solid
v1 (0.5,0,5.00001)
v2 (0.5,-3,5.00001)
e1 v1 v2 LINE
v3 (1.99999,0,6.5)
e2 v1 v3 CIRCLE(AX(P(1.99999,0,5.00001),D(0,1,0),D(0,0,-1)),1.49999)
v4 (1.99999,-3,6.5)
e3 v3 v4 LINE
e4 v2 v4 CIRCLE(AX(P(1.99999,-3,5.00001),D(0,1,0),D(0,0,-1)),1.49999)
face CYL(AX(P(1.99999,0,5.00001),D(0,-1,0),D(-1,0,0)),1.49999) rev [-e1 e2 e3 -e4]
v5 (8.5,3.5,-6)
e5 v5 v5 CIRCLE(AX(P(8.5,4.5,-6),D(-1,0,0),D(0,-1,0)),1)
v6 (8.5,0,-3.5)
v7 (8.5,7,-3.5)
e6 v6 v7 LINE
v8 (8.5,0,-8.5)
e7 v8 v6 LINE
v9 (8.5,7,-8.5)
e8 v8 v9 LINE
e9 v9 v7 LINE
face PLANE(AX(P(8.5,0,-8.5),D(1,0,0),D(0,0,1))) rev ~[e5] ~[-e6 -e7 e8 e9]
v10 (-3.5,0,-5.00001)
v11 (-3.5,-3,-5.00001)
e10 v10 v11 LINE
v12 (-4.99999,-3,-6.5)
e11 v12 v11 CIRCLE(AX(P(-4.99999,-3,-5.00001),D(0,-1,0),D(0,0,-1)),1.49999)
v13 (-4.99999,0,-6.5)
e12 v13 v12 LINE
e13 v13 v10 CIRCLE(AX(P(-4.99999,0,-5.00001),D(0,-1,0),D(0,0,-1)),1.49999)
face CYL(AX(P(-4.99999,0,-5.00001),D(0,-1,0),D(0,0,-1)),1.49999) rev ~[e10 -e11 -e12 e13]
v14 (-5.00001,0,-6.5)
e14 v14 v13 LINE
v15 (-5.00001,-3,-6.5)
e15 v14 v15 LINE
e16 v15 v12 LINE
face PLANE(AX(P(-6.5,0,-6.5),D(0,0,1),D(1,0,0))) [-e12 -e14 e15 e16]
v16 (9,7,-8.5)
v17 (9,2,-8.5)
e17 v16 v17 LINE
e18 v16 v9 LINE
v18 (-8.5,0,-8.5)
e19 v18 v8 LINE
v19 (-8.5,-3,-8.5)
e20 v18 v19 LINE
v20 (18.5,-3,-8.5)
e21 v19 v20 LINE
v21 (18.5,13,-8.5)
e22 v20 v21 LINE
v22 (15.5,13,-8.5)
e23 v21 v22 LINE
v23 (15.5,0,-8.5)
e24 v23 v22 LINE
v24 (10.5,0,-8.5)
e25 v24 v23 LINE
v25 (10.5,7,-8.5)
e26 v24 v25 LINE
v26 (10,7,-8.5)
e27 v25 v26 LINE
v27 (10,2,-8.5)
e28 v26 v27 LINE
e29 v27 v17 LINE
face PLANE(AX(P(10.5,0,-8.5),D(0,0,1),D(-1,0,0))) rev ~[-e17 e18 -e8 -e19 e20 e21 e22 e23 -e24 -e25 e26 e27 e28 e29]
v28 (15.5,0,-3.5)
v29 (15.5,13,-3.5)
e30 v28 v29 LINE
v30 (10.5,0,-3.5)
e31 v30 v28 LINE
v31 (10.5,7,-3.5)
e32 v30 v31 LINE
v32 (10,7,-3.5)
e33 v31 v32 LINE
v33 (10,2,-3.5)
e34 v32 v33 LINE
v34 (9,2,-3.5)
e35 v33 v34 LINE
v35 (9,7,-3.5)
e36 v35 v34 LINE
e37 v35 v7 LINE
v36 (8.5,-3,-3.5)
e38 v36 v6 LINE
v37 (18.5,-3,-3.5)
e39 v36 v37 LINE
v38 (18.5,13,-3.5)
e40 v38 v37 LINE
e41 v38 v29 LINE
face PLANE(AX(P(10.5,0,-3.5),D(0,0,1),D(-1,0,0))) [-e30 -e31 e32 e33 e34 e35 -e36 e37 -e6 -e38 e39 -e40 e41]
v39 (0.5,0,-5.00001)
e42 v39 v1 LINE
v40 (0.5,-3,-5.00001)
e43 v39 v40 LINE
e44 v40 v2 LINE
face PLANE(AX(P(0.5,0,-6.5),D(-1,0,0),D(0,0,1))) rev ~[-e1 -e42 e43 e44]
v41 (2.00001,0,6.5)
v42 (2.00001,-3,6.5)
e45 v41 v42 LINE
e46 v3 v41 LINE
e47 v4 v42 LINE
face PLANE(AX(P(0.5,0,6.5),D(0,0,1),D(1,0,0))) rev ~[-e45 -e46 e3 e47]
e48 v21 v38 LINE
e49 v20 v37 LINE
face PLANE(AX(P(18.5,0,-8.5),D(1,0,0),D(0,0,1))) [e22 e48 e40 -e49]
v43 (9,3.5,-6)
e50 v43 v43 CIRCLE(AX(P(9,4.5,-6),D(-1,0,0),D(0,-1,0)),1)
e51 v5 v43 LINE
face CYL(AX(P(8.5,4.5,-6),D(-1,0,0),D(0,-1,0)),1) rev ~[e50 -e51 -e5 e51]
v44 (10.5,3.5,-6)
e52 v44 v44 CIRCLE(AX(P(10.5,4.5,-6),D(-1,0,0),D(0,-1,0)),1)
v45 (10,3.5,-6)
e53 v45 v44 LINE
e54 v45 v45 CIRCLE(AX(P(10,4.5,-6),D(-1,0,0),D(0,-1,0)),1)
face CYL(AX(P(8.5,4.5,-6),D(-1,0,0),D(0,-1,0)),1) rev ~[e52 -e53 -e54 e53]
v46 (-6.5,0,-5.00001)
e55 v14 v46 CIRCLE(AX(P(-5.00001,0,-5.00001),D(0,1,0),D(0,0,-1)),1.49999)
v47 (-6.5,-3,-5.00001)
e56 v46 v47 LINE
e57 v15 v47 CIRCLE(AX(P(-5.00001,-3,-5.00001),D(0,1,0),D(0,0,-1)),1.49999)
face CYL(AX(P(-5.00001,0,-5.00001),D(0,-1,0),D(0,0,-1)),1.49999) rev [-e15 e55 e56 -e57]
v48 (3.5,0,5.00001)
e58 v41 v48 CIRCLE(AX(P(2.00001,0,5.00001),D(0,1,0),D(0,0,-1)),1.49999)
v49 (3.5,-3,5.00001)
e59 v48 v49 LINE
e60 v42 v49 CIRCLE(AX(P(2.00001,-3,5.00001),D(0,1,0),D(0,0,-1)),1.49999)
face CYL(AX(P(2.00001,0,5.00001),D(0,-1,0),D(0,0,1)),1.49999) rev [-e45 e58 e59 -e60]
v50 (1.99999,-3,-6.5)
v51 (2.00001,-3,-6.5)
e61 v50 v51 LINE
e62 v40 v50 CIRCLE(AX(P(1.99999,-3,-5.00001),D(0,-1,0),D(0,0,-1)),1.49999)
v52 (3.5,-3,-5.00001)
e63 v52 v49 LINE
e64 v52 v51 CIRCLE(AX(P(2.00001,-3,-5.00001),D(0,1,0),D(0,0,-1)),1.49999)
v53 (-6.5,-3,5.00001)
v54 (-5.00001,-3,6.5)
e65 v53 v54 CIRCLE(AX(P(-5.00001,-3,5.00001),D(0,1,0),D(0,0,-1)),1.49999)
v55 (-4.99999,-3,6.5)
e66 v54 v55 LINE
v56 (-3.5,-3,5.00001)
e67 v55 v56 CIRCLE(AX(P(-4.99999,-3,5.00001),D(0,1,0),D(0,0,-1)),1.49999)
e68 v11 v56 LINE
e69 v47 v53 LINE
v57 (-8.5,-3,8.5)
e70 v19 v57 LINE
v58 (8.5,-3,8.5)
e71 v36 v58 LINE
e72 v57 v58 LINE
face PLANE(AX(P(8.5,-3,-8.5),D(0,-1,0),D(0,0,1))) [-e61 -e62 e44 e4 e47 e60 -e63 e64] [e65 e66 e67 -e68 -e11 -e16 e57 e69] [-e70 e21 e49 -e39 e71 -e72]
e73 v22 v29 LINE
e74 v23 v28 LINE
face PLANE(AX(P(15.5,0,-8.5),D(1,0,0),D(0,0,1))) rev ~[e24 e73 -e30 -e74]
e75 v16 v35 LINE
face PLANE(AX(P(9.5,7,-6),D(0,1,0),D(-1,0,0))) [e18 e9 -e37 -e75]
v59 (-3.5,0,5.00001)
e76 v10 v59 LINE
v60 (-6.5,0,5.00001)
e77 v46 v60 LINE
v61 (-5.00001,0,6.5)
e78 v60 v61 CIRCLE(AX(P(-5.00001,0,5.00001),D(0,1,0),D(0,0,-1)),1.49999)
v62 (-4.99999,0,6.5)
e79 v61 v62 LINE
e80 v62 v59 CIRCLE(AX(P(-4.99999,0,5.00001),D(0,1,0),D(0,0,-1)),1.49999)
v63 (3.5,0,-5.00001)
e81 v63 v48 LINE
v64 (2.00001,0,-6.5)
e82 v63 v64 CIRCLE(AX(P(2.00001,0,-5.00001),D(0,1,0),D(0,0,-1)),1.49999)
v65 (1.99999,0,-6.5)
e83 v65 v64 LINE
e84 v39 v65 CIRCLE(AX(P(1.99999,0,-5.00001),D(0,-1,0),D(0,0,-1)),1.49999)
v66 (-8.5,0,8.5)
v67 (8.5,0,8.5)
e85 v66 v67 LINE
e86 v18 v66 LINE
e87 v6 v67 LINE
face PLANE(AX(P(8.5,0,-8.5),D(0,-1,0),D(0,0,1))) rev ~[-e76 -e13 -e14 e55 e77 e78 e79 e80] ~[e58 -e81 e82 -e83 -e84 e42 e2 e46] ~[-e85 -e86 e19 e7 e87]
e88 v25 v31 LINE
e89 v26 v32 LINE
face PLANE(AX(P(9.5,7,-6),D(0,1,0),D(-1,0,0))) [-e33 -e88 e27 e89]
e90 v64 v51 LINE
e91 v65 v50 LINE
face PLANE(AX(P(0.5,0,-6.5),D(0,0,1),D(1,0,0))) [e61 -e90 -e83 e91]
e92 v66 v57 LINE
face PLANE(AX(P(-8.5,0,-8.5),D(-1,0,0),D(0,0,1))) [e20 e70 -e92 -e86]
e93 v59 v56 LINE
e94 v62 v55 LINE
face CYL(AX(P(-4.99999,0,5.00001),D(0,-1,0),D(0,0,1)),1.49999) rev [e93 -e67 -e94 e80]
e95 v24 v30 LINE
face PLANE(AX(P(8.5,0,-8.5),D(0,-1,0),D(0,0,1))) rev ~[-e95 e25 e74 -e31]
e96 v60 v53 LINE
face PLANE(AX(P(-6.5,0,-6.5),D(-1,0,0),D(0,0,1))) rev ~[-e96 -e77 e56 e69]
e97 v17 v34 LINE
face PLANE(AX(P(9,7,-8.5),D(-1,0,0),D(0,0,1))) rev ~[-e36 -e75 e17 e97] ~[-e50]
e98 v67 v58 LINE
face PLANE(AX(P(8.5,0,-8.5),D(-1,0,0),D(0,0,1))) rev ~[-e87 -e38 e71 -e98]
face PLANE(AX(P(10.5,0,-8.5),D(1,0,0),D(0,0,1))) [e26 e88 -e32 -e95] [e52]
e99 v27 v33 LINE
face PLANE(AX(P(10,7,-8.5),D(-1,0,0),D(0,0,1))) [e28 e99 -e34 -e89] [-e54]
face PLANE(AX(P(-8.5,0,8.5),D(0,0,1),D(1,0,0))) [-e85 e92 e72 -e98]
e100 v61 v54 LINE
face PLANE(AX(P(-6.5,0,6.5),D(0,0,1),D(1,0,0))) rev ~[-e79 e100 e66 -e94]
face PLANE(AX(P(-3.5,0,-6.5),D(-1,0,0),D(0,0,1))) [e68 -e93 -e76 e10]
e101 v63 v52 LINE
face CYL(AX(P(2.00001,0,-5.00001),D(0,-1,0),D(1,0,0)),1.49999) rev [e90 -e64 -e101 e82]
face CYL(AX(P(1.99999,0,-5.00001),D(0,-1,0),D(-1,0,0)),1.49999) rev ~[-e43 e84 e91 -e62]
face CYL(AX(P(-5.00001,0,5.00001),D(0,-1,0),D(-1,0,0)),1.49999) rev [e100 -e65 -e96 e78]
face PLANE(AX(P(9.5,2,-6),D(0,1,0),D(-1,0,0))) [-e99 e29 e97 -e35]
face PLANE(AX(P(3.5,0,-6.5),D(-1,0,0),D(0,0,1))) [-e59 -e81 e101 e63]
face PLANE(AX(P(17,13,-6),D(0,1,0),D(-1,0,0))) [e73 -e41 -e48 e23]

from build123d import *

# Parameters (mm, degrees)
F0_W      = 17
F0_H      = 17
F0_W_2    = 3
F0_H_2    = 13
F1_DEPTH  = 3
F2_W      = 3
F2_H      = 5
F3_DEPTH  = 10
F4_W      = 3
F4_H      = 5
F5_DEPTH  = 13
F6_W      = 2
F6_H      = 5
F7_DEPTH  = 7
F8_W      = 1
F8_H      = 5
F9_DEPTH  = 5
F10_R     = 1
F11_DEPTH = 3
F12_R     = 1.49999


# Not quite as in the source:
# - a fillet or chamfer is up to 0.001 mm smaller than in the source, because OpenCascade refuses the exact size


with BuildPart() as f1:
    # F0 (on Front) → F1 (new body)
    with BuildSketch(Plane.XZ):
        Rectangle(F0_W, F0_H)
        with Locations((-5, 0)):
            Rectangle(F0_W_2, F0_H_2, mode=Mode.SUBTRACT)
        with Locations((2, 0)):
            Rectangle(F0_W_2, F0_H_2, mode=Mode.SUBTRACT)
    extrude(amount=F1_DEPTH)

    # F2 (on face) → F3 (join)
    with BuildSketch(Plane.YZ.offset(8.5)):
        with Locations((-1.5, -6)):
            Rectangle(F2_W, F2_H)
    extrude(amount=F3_DEPTH)

    # F4 (on face) → F5 (join)
    with BuildSketch(Plane(origin=(0, 0, 0), x_dir=(-1, 0, 0), z_dir=(0, 1, 0))):
        with Locations((-17, -6)):
            Rectangle(F4_W, F4_H)
    extrude(amount=F5_DEPTH)

    # F6 (on face) → F7 (join)
    with BuildSketch(Plane(origin=(0, 0, 0), x_dir=(-1, 0, 0), z_dir=(0, 1, 0))):
        with Locations((-9.5, -6)):
            Rectangle(F6_W, F6_H)
    extrude(amount=F7_DEPTH)

    # F8 (on face) → F9 (cut)
    with BuildSketch(Plane(origin=(0, 7, 0), x_dir=(-1, 0, 0), z_dir=(0, 1, 0))):
        with Locations((-9.5, -6)):
            Rectangle(F8_W, F8_H)
    extrude(amount=-F9_DEPTH, mode=Mode.SUBTRACT)

    # F10 (on face) → F11 (cut)
    with BuildSketch(Plane(origin=(8.5, 0, 0), x_dir=(0, -1, 0), z_dir=(-1, 0, 0))):
        with Locations((-4.5, -6)):
            Circle(F10_R)
    extrude(amount=-F11_DEPTH, mode=Mode.SUBTRACT)

    # F12 (radius 1.5 in the source; OpenCascade refuses exactly that, so slightly less here)
    f12_edges = [f1.edges().sort_by_distance(p)[0] for p in [
        (-6.5, -1.5, 6.5),
        (0.5, -1.5, 6.5),
        (3.5, -1.5, 6.5),
        (-3.5, -1.5, 6.5),
        (-3.5, -1.5, -6.5),
        (3.5, -1.5, -6.5),
        (0.5, -1.5, -6.5),
        (-6.5, -1.5, -6.5),
    ]]
    fillet(f12_edges, radius=F12_R)


solid = f1.part
